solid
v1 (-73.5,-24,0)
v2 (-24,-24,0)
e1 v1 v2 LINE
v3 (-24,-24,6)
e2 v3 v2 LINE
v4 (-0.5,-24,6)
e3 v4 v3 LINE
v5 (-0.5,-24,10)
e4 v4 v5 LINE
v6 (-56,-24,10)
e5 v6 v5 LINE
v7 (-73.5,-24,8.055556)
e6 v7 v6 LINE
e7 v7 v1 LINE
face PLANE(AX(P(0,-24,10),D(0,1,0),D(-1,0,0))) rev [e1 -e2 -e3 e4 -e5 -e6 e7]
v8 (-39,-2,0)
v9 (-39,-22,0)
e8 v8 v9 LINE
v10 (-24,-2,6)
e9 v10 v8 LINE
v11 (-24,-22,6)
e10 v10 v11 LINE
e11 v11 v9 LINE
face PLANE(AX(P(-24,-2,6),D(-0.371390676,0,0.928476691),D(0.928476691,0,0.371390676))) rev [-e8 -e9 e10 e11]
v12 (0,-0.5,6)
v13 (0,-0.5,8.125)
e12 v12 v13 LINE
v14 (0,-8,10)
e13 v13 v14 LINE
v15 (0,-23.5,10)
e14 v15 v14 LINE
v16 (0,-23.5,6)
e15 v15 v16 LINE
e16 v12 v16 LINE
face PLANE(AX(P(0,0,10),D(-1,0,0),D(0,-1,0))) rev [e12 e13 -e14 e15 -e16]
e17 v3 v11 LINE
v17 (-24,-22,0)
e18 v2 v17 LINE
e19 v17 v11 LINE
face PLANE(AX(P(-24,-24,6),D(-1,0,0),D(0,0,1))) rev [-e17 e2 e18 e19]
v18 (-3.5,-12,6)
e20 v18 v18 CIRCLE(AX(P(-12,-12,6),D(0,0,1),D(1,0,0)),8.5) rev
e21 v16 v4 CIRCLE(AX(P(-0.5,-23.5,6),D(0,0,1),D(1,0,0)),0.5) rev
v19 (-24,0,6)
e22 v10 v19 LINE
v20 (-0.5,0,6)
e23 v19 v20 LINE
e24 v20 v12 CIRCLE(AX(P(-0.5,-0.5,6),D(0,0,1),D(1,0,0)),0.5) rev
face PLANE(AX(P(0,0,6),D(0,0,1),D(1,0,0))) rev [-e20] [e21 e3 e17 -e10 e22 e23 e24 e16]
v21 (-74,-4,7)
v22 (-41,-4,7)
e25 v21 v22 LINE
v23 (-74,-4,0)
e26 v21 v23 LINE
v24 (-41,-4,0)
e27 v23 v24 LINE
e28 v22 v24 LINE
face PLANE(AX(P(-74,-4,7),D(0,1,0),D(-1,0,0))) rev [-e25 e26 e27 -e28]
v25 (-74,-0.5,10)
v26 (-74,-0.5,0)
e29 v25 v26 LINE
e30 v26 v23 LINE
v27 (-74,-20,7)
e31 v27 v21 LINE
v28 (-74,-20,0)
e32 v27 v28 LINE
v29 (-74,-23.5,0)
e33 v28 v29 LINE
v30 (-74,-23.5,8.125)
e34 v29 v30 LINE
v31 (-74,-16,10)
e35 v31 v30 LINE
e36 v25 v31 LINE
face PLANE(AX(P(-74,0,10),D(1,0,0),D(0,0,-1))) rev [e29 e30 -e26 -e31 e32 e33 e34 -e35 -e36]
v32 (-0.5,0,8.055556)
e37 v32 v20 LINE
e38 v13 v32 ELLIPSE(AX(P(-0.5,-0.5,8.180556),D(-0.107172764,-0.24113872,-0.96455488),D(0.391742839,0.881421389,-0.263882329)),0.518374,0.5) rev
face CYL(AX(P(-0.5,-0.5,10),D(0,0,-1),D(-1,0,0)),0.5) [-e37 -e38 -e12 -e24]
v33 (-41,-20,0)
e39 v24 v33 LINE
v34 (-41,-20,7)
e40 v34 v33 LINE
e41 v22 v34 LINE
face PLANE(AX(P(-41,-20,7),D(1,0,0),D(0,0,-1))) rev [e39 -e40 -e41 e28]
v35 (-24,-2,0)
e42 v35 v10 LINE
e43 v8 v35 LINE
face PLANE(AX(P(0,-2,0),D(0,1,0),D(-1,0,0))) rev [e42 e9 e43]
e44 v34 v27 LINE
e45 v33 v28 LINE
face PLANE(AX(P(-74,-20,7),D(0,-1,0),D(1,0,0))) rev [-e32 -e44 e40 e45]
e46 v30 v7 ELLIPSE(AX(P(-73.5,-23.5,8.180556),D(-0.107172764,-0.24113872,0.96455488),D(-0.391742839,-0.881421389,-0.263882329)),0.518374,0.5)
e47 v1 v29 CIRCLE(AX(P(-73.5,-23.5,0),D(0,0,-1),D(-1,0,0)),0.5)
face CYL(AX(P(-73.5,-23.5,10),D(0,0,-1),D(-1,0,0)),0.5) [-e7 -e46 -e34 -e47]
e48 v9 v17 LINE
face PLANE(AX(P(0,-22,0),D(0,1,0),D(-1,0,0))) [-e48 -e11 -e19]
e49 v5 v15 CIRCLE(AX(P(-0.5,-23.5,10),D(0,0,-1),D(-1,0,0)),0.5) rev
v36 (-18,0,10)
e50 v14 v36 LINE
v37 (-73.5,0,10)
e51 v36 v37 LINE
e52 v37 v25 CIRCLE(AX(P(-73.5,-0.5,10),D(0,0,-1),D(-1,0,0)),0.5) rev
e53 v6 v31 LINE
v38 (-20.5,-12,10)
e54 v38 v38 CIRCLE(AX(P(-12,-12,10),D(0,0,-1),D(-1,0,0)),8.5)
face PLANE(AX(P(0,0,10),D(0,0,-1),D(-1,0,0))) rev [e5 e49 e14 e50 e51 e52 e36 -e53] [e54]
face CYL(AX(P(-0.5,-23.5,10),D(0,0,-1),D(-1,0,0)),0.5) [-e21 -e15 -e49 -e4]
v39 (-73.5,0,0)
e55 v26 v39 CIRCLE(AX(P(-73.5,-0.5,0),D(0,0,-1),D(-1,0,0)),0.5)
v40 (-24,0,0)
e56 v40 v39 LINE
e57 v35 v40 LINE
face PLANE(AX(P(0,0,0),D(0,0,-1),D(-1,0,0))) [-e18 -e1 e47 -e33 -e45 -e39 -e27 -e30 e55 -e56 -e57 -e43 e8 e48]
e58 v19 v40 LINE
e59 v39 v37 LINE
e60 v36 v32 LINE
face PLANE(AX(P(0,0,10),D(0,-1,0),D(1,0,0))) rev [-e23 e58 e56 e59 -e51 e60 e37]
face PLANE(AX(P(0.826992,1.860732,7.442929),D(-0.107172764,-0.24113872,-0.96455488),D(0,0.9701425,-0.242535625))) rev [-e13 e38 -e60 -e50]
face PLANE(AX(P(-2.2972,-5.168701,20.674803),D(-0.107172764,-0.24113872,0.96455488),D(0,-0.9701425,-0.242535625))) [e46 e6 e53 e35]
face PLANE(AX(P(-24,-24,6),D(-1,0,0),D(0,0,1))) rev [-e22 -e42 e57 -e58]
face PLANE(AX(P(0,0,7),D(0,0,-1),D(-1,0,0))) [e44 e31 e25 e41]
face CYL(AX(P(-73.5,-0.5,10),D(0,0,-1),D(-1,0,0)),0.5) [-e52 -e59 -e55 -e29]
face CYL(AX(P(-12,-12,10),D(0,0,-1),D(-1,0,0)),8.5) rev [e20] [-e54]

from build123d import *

# Parameters (mm, degrees)
SKETCH_1_W          = 74
SKETCH_1_H          = 24
EXTRUDE_1_DEPTH     = 10
CHAMFER_START       = 7.716439039
CHAMFER_1_OUTLINE_W = 21
CHAMFER_1_OUTLINE_H = 12
CHAMFER_1_DEPTH     = 3.283560961
SKETCH_2_R          = 8.5
CUT_EXTRUDE_1_DEPTH = 10
SKETCH_3_W          = 24
SKETCH_3_H          = 24
CUT_EXTRUDE_2_DEPTH = 6
CHAMFER_START_2     = -24
CHAMFER_3_OUTLINE_W = 21
CHAMFER_3_OUTLINE_H = 11
CHAMFER_3_DEPTH     = 2.565447114
FILLET_1_R          = 0.5
CUT_EXTRUDE_3_DEPTH = 10
SKETCH_5_W          = 33
SKETCH_5_H          = 16
CUT_EXTRUDE_4_DEPTH = 7


with BuildPart() as part:
    # 草图1 → 凸台-拉伸1 (new body)
    with BuildSketch(Plane.XY):
        with Locations((-37, -12)):
            Rectangle(SKETCH_1_W, SKETCH_1_H)
    extrude(amount=EXTRUDE_1_DEPTH)

    # 倒角1: read off the stored shape, not the designer's step
    # 倒角1 outline → 倒角1 (cut)
    with BuildSketch(Plane(origin=(0, 0, 0), x_dir=(0.994240412860114, -0.02599321340810768, -0.1039728536324305), z_dir=(0.10717276443084896, 0.24113871996940994, 0.9645548798776378)).offset(CHAMFER_START)):
        with Locations((-9.5, -6)):
            Rectangle(CHAMFER_1_OUTLINE_W, CHAMFER_1_OUTLINE_H)
    extrude(amount=CHAMFER_1_DEPTH, mode=Mode.SUBTRACT)

    # 草图2 → 切除-拉伸1 (cut)
    with BuildSketch(Plane(origin=(0, 0, 0), x_dir=(-1, 0, 0), z_dir=(0, 0, -1))):
        with Locations((12, -12)):
            Circle(SKETCH_2_R)
    extrude(amount=-CUT_EXTRUDE_1_DEPTH, mode=Mode.SUBTRACT)

    # 草图3 → 切除-拉伸2 (cut)
    with BuildSketch(Plane(origin=(0, 0, 0), x_dir=(-1, 0, 0), z_dir=(0, 0, -1))):
        with Locations((12, -12)):
            Rectangle(SKETCH_3_W, SKETCH_3_H)
    extrude(amount=-CUT_EXTRUDE_2_DEPTH, mode=Mode.SUBTRACT)

    # 倒角3: read off the stored shape, not the designer's step
    # 倒角3 outline → 倒角3 (cut)
    with BuildSketch(Plane(origin=(0, 0, 0), x_dir=(0.994240412860114, -0.02599321340810768, 0.1039728536324305), z_dir=(0.10717276443084896, 0.24113871996940994, -0.9645548798776378)).offset(CHAMFER_START_2)):
        with Locations((-63.5, 17.5)):
            Rectangle(CHAMFER_3_OUTLINE_W, CHAMFER_3_OUTLINE_H)
    extrude(amount=CHAMFER_3_DEPTH, mode=Mode.SUBTRACT)

    # 圆角1
    fillet_1_edges = [part.edges().sort_by_distance(p)[0] for p in [
        (0, 0, 7),
        (-74, -24, 4),
        (0, -24, 8),
        (-74, 0, 5),
    ]]
    fillet(fillet_1_edges, radius=FILLET_1_R)

    # 草图4 → 切除-拉伸3 (cut, symmetric)
    with BuildSketch(Plane(origin=(0, -12, 0), x_dir=(-1, 0, 0), z_dir=(0, -1, 0))):
        Polygon((24, -6), (39, 0), (24, 0), align=None)
    extrude(amount=CUT_EXTRUDE_3_DEPTH, both=True, mode=Mode.SUBTRACT)

    # 草图5 → 切除-拉伸4 (cut)
    with BuildSketch(Plane(origin=(0, 0, 0), x_dir=(-1, 0, 0), z_dir=(0, 0, -1))):
        with Locations((57.5, -12)):
            Rectangle(SKETCH_5_W, SKETCH_5_H)
    extrude(amount=-CUT_EXTRUDE_4_DEPTH, mode=Mode.SUBTRACT)


solid = part.part
